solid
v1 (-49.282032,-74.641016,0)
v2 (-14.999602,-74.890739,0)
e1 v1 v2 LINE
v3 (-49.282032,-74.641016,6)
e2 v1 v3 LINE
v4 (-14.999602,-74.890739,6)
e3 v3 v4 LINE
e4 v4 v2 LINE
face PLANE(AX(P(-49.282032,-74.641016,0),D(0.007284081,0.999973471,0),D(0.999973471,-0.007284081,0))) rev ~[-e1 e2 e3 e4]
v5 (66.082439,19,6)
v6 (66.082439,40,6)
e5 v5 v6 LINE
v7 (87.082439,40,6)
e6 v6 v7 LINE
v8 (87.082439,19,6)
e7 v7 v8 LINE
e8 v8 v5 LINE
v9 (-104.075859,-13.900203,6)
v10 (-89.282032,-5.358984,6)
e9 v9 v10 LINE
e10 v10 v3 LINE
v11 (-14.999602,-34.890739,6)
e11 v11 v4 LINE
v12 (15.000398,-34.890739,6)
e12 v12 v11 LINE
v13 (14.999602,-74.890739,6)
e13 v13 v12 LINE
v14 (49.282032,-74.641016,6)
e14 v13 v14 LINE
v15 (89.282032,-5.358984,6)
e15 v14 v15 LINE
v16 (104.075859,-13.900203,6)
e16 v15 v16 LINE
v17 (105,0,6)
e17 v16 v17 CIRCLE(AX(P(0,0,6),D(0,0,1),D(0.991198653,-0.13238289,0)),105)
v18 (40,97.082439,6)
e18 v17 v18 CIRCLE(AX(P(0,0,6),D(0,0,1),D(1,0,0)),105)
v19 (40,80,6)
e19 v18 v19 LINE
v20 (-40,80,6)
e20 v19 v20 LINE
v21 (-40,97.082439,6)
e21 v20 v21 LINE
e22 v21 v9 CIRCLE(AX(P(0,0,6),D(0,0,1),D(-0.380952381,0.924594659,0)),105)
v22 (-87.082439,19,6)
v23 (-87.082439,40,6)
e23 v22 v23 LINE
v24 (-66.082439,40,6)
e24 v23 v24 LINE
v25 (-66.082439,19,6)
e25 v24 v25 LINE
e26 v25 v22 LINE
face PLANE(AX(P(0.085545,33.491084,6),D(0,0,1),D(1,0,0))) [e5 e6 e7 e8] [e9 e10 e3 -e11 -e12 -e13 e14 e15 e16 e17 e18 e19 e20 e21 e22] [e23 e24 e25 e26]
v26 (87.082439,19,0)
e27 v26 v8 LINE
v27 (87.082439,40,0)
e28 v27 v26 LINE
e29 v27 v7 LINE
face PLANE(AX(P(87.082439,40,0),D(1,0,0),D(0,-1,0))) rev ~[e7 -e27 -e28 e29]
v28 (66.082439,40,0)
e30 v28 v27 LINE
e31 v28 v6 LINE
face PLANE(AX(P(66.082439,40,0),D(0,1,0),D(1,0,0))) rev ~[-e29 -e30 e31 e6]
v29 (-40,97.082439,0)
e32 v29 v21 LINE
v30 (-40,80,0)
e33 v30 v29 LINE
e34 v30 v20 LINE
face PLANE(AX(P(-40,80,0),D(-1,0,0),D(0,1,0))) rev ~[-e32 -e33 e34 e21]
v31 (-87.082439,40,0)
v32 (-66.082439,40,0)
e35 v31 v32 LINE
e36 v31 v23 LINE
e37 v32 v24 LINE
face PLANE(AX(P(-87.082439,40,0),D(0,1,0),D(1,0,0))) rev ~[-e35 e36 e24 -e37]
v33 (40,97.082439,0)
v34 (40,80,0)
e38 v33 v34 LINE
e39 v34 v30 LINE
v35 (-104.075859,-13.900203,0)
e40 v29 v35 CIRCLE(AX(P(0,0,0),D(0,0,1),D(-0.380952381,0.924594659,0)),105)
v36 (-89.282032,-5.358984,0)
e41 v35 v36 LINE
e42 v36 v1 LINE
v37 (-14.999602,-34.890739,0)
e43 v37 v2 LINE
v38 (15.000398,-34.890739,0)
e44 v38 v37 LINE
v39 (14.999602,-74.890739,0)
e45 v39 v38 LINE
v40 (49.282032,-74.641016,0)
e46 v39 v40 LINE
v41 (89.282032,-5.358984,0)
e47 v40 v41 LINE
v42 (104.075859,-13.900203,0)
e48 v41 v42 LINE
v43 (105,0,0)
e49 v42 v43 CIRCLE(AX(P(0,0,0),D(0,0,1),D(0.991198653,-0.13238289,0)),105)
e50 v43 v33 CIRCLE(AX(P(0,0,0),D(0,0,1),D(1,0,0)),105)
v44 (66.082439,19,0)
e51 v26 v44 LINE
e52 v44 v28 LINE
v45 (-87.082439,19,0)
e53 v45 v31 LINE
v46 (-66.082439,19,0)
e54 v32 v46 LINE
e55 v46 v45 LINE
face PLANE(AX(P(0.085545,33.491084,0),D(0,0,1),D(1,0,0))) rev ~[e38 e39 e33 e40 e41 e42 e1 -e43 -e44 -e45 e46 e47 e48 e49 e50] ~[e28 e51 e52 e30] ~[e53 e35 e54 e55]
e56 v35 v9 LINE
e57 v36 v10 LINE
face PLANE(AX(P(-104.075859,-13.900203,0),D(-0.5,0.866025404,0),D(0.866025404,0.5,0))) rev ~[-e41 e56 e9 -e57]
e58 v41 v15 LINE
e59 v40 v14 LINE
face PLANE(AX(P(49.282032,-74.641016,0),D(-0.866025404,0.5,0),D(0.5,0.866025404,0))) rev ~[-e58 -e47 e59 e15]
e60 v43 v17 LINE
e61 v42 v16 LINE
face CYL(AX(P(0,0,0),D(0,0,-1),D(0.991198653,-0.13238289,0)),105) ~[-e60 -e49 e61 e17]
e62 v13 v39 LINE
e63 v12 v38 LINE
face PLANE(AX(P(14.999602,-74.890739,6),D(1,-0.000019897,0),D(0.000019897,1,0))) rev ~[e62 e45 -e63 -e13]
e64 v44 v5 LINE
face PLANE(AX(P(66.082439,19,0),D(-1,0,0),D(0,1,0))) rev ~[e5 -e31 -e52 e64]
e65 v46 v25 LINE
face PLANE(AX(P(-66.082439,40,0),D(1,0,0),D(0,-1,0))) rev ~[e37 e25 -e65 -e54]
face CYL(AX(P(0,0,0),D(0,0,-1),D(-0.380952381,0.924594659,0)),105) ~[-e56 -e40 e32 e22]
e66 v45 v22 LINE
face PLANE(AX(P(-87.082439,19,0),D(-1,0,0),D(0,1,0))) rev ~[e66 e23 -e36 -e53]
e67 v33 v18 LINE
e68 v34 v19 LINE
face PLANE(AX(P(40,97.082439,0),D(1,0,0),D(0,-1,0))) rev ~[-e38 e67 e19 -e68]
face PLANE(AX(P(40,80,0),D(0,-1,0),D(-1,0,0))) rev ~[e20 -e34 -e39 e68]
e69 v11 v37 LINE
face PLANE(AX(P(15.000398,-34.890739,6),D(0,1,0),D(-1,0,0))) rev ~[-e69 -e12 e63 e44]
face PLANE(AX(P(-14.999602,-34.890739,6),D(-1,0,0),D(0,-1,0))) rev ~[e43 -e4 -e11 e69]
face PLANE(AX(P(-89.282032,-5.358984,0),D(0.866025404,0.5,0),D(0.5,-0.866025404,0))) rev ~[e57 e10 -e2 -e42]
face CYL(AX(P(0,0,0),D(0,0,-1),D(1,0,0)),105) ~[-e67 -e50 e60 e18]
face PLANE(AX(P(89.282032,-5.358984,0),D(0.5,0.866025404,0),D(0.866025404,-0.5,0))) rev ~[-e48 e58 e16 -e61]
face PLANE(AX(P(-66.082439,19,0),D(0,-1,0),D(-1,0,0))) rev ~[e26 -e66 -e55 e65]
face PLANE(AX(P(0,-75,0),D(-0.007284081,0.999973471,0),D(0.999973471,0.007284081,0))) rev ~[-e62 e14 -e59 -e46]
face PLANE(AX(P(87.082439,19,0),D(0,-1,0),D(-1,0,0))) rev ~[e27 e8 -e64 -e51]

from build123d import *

# Parameters (mm, degrees)
F1_DEPTH = 6
F3_DEPTH = 25


# Not quite as in the source:
# - a feature names something its author has since deleted; it is built from what else it names


with BuildPart() as f1:
    # F0 (on Top) → F1 (new body)
    with BuildSketch(Plane.XY):
        with BuildLine():
            ThreePointArc((104.075858604, -13.900203446), (104.7687099124, -6.9654449456), (105, 0))
            ThreePointArc((105, 0), (87.2496418331, 58.4166072277), (40, 97.0824391947))
            Line((40, 97.0824391947), (40, 80))
            Line((40, 80), (0, 80))
            Line((0, 80), (-40, 80))
            Line((-40, 80), (-40, 97.0824391947))
            ThreePointArc((-40, 97.0824391947), (-90.9326673974, 52.5), (-104.075858604, -13.900203446))
            Line((-104.075858604, -13.900203446), (-89.2820323028, -5.3589838486))
            Line((-89.2820323028, -5.3589838486), (-95.2820323028, 5.0333209968))
            Line((-95.2820323028, 5.0333209968), (-71.0910346562, 19))
            Line((-71.0910346562, 19), (-87.0824391947, 19))
            Line((-87.0824391947, 19), (-87.0824391947, 40))
            Line((-87.0824391947, 40), (-66.0824391947, 40))
            Line((-66.0824391947, 40), (-66.0824391947, 21.8917139379))
            Line((-66.0824391947, 21.8917139379), (-56.3108891325, 27.5333209968))
            Line((-56.3108891325, 27.5333209968), (-30.3108891325, -17.5))
            Line((-30.3108891325, -17.5), (-30.3108891325, 35))
            Line((-30.3108891325, 35), (30.3108891325, 35))
            Line((30.3108891325, 35), (30.3108891325, -17.5))
            Line((30.3108891325, -17.5), (56.3108891325, 27.5333209968))
            Line((56.3108891325, 27.5333209968), (66.0824391947, 21.8917139379))
            Line((66.0824391947, 21.8917139379), (66.0824391947, 40))
            Line((66.0824391947, 40), (87.0824391947, 40))
            Line((87.0824391947, 40), (87.0824391947, 19))
            Line((87.0824391947, 19), (71.0910346562, 19))
            Line((71.0910346562, 19), (95.2820323028, 5.0333209968))
            Line((95.2820323028, 5.0333209968), (89.2820323028, -5.3589838486))
            Line((89.2820323028, -5.3589838486), (104.075858604, -13.900203446))
        make_face()
        Polygon((-95.2820323028, 5.0333209968), (-89.2820323028, -5.3589838486), (-69.2820323028, -40), (-30.3108891325, -17.5), (-56.3108891325, 27.5333209968), (-66.0824391947, 21.8917139379), (-66.0824391947, 19), (-71.0910346562, 19), align=None)
        Polygon((0, -17.5), (30.3108891325, -17.5), (30.3108891325, 35), (-30.3108891325, 35), (-30.3108891325, -17.5), align=None)
        Polygon((69.2820323028, -40), (89.2820323028, -5.3589838486), (95.2820323028, 5.0333209968), (71.0910346562, 19), (66.0824391947, 19), (66.0824391947, 21.8917139379), (56.3108891325, 27.5333209968), (30.3108891325, -17.5), align=None)
        Polygon((-49.2820323028, -74.6410161514), (0, -75), (0, -17.5), (-30.3108891325, -17.5), (-69.2820323028, -40), align=None)
        Polygon((0, -75), (49.2820323028, -74.6410161514), (69.2820323028, -40), (30.3108891325, -17.5), (0, -17.5), align=None)
    extrude(amount=F1_DEPTH)

    # F2 (on face) → F3 (cut)
    with BuildSketch(Plane.XY.offset(6)):
        Polygon((-14.9996020609, -74.890738782), (0, -75), (14.9996020609, -74.890738782), (15.0003979391, -34.890738782), (-14.9996020609, -34.890738782), align=None)
    extrude(amount=-F3_DEPTH, mode=Mode.SUBTRACT)


solid = f1.part
